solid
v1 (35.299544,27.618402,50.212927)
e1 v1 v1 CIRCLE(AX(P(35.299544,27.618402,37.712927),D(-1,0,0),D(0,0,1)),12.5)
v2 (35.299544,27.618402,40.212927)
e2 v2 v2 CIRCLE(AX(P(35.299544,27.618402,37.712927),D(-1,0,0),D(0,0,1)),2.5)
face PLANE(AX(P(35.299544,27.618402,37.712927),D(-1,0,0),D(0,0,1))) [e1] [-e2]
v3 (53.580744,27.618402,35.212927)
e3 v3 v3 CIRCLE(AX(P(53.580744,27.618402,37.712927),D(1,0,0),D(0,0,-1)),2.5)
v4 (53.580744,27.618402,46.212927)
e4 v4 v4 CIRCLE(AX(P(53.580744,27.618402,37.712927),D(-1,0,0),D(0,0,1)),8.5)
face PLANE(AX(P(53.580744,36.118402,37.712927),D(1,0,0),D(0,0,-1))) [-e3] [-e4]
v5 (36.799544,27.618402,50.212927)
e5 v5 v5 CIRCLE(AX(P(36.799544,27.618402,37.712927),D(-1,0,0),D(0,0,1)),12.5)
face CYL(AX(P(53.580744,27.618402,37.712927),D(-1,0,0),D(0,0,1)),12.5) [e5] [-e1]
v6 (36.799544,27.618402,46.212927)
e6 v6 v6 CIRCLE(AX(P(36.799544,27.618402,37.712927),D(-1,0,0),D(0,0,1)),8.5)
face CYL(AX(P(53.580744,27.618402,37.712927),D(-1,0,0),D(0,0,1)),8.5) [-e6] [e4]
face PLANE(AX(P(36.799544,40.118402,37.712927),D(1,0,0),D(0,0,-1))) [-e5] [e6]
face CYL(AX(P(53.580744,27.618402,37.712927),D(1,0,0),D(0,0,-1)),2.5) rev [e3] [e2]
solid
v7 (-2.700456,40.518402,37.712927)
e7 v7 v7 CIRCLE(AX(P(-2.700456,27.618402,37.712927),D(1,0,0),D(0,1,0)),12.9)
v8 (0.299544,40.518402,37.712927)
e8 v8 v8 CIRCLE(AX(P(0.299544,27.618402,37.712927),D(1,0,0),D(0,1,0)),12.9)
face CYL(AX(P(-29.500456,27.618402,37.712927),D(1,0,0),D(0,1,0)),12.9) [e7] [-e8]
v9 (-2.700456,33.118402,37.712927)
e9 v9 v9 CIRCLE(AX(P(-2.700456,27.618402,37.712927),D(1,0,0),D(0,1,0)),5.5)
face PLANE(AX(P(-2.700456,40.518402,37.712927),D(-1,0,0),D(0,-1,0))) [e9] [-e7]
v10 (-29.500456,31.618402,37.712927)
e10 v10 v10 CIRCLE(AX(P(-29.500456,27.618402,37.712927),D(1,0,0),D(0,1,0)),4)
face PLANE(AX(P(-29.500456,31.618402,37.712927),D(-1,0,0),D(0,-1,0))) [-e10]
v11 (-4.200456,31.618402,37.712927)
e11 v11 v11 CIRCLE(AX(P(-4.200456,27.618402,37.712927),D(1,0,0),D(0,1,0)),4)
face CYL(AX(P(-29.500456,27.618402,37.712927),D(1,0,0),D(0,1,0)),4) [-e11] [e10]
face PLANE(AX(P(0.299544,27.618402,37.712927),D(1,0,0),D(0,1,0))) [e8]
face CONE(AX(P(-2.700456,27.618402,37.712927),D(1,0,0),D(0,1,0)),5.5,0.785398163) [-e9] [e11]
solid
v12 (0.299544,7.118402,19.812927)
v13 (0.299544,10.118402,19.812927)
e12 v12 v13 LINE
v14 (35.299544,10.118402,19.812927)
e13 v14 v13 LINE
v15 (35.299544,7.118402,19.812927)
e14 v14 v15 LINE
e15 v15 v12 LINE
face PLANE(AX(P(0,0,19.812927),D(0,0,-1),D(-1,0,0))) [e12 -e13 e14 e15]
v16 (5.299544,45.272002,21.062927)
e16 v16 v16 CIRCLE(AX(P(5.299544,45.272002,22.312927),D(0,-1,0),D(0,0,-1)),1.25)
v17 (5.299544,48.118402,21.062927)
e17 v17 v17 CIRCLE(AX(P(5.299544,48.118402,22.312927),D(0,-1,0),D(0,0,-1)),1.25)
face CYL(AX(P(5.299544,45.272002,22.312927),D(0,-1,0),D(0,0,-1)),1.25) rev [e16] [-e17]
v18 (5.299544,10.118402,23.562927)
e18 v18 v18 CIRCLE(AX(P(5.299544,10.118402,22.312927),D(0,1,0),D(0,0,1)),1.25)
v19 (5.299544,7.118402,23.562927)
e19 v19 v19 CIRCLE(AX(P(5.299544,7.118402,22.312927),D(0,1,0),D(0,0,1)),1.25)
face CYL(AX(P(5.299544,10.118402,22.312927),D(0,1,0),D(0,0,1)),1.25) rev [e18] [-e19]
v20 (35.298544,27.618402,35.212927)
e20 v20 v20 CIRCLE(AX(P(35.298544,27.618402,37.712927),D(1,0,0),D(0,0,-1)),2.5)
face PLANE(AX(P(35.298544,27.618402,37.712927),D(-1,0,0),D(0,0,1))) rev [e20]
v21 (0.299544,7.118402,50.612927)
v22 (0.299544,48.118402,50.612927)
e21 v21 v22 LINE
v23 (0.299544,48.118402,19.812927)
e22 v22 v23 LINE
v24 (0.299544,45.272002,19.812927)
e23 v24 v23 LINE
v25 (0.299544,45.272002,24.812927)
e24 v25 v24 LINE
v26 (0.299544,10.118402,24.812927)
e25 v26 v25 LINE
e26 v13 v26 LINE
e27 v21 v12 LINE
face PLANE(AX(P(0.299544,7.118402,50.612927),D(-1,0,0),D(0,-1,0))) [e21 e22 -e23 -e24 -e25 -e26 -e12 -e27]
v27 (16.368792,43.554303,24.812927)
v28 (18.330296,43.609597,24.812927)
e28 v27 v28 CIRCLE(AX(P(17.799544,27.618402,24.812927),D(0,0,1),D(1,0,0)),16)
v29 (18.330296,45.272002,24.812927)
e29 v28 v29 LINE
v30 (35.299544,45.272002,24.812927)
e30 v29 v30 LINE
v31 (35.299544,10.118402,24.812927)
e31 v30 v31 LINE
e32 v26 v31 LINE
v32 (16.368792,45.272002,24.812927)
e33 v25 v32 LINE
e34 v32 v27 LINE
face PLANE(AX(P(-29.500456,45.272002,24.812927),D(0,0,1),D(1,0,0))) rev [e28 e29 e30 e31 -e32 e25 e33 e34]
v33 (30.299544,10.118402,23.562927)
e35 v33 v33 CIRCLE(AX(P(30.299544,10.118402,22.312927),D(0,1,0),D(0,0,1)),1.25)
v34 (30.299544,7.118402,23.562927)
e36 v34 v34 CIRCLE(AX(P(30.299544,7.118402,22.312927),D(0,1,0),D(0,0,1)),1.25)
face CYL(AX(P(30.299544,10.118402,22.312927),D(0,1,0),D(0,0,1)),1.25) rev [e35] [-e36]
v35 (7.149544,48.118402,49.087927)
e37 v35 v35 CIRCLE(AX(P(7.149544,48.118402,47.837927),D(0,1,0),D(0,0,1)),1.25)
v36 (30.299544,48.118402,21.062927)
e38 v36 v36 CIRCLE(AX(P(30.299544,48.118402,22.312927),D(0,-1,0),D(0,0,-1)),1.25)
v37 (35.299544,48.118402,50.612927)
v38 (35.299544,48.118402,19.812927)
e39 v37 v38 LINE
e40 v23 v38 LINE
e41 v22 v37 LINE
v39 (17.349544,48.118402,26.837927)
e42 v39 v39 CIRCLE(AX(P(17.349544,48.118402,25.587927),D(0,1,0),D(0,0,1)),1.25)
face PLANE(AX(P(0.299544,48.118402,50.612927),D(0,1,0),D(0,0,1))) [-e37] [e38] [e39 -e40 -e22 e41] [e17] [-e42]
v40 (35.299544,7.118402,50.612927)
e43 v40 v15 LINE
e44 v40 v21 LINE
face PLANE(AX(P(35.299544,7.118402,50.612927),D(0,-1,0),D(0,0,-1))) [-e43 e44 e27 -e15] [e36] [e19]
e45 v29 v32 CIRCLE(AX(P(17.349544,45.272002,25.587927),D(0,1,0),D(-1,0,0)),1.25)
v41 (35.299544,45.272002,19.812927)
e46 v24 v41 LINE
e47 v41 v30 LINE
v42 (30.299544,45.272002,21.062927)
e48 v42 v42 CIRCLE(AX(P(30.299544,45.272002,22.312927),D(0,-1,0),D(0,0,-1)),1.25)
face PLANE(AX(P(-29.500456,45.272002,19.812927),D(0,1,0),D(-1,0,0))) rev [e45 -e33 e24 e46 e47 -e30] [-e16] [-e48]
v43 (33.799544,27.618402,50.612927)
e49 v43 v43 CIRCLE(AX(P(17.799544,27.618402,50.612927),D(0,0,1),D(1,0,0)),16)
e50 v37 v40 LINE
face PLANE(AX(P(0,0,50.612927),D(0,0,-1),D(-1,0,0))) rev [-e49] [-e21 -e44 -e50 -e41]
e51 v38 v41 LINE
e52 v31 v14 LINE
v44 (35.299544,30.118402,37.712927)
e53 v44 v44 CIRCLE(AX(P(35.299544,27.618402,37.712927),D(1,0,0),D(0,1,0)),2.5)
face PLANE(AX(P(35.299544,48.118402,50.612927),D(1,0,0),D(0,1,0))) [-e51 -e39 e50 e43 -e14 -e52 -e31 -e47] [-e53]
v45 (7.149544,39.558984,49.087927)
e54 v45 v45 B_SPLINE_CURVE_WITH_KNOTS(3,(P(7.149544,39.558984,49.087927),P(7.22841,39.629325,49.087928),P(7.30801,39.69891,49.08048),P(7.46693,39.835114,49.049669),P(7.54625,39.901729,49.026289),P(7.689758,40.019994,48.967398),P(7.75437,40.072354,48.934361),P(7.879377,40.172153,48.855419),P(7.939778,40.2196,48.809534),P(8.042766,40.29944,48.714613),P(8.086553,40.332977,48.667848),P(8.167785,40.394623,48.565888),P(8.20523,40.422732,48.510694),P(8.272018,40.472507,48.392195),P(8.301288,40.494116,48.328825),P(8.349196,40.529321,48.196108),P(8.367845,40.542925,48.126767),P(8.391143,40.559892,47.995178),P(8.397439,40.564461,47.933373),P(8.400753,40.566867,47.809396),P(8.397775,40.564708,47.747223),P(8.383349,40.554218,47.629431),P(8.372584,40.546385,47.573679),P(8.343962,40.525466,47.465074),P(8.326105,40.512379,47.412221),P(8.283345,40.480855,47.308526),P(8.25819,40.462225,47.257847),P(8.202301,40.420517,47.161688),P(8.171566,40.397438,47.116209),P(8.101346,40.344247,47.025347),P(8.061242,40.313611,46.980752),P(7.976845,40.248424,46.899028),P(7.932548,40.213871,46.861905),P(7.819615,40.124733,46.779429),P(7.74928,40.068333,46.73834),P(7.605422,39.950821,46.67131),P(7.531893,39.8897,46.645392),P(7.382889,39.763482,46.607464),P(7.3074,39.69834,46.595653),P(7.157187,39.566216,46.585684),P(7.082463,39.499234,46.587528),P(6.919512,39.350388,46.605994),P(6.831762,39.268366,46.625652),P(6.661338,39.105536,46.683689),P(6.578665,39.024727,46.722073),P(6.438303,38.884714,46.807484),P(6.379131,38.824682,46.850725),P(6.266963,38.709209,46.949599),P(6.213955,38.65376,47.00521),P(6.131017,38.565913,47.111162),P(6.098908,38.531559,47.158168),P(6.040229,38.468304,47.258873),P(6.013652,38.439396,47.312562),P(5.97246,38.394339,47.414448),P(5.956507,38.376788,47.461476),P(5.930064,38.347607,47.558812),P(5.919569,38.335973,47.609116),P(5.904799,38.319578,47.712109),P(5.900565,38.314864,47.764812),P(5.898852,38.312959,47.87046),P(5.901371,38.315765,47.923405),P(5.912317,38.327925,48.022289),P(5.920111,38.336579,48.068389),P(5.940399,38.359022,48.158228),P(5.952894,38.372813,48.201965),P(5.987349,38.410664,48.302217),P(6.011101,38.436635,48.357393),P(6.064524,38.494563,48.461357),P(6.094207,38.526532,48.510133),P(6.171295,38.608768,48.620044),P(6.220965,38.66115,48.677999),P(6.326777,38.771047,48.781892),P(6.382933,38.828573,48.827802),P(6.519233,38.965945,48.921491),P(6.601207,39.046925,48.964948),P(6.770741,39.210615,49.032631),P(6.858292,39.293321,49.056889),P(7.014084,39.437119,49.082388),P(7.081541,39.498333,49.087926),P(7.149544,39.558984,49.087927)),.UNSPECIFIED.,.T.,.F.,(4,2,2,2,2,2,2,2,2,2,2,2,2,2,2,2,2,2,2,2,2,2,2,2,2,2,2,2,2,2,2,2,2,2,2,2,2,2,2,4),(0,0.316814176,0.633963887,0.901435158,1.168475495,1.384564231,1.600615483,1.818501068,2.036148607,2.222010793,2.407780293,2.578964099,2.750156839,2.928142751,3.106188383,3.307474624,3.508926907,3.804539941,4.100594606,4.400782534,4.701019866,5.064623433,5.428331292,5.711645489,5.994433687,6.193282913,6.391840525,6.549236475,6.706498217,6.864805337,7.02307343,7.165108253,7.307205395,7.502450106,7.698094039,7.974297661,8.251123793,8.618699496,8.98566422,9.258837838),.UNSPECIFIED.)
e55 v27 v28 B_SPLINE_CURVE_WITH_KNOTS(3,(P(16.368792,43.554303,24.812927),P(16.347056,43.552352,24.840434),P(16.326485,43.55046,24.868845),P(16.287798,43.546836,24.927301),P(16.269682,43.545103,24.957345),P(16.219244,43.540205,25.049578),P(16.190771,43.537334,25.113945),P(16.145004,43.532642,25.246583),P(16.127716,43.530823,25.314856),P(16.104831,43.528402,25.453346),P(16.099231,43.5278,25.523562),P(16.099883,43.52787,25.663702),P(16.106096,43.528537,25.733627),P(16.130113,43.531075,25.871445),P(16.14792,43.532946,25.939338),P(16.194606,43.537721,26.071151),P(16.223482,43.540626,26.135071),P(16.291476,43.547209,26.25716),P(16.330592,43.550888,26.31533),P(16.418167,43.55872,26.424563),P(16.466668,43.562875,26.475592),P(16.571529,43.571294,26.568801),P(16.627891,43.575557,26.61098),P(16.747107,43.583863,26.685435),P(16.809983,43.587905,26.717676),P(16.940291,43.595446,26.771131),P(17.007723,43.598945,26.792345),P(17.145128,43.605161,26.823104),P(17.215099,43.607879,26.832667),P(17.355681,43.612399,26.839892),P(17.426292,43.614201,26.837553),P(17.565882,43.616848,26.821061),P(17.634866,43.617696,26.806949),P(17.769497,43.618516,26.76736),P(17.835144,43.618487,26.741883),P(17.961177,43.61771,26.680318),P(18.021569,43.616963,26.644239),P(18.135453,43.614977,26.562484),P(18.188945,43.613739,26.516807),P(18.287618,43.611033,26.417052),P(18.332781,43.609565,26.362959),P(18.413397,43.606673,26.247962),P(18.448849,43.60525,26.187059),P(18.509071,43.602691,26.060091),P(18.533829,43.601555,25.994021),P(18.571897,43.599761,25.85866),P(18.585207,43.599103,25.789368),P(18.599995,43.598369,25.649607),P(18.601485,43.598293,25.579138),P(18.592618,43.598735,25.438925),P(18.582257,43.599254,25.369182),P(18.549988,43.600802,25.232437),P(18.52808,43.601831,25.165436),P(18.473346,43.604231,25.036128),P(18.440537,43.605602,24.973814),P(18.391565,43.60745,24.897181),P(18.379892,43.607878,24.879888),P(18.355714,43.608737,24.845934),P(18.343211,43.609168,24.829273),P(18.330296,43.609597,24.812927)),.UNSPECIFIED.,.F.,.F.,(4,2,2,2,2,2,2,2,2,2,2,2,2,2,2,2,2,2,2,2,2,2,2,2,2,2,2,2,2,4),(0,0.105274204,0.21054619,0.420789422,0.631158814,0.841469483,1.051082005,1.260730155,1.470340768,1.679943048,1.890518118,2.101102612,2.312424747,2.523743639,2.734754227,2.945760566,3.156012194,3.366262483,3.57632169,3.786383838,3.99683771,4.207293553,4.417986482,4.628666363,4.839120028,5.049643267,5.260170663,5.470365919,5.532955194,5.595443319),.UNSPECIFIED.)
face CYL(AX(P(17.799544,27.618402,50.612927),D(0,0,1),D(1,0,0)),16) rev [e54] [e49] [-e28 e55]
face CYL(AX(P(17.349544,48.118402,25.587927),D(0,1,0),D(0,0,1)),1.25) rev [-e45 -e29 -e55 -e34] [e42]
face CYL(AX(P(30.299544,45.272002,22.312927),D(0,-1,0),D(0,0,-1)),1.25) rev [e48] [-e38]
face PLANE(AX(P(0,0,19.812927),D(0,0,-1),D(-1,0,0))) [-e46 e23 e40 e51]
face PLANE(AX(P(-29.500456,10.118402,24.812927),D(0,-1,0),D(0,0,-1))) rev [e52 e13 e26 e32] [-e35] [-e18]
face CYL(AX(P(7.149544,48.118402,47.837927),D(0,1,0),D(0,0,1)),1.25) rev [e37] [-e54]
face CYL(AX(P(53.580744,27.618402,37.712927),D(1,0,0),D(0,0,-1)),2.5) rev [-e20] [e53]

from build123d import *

# Parameters (mm, degrees)
SKETCH24_W                     = 35
SKETCH24_H                     = 41
BOSS_EXTRUDE2_DEPTH            = 30.8
SKETCH30_W                     = 5
SKETCH30_H                     = 35.1536
CUT_EXTRUDE2_DEPTH             = 96.268509944
SKETCH38_W                     = 16
SKETCH38_H                     = 30.8
F_10_START                     = 35.298543859
F_10_CLEARANCE_HOLE2_OUTLINE_R = 2.5
F_10_CLEARANCE_HOLE2_DEPTH     = 18.2822
SKETCH42_W                     = 1.25
SKETCH42_H                     = 20.5
SKETCH44_W                     = 1.25
SKETCH44_H                     = 20.5
SKETCH46_W                     = 1.25
SKETCH46_H                     = 2.8464
F_2_CLEARANCE_HOLE7_AT_2_COUNT = 2
F_2_CLEARANCE_HOLE7_AT_2_PITCH = 25
SKETCH48_W                     = 1.25
SKETCH48_H                     = 3
F_2_CLEARANCE_HOLE8_AT_2_COUNT = 2
F_2_CLEARANCE_HOLE8_AT_2_PITCH = 25


# Read off the part's stored shape, not the designer's step: #10 Clearance Hole2
with BuildPart() as part:
    # Sketch19 → Revolve2 (revolve)
    with BuildSketch(Plane.XY.offset(37.712926777)):
        Polygon((-29.500456141, 31.618402197), (-29.500456141, 27.618402197), (0.299543859, 27.618402197), (0.299543859, 40.518402197), (-2.700456141, 40.518402197), (-2.700456141, 33.118402196), (-4.200456141, 31.618402197), align=None)
    revolve(axis=Axis((-29.500456141, 27.618402197, 37.712926777), (1, 0, 0)))


with BuildPart() as body_2:
    # Sketch24 → Boss-Extrude2 (new body)
    with BuildSketch(Plane(origin=(0, 0, 19.812926777), x_dir=(-1, 0, 0), z_dir=(0, 0, -1))):
        with Locations((-17.799543859, 27.618402197)):
            Rectangle(SKETCH24_W, SKETCH24_H)
    extrude(amount=-BOSS_EXTRUDE2_DEPTH)

    # Sketch30 → Cut-Extrude2 (cut, through all)
    with BuildSketch(Plane(origin=(35.299543859, 0, 0), x_dir=(0, 0, -1), z_dir=(1, 0, 0))):
        with Locations((-22.312926777, 27.695202197)):
            Rectangle(SKETCH30_W, SKETCH30_H)
    extrude(amount=-CUT_EXTRUDE2_DEPTH, mode=Mode.SUBTRACT)

    # Sketch38 → Hole2 (revolve, cut)
    with BuildSketch(Plane(origin=(17.799543859, 27.618402197, 50.612926777), x_dir=(0, -1, 0), z_dir=(1, 0, 0))):
        with Locations((8, 15.4)):
            Rectangle(SKETCH38_W, SKETCH38_H)
    revolve(axis=Axis((17.799543859, 27.618402197, -59.387073223), (0, 0, 1)), mode=Mode.SUBTRACT)


with BuildPart() as body_3:
    # Sketch37 → Revolve3 (revolve)
    with BuildSketch(Plane(origin=(0, 0, 37.712926777), x_dir=(-1, 0, 0), z_dir=(0, 0, -1)), mode=Mode.PRIVATE) as revolve3_sk:
        Polygon((-53.580743859, 36.118402197), (-53.580743859, 27.618402197), (-35.299543859, 27.618402197), (-35.299543859, 40.118402197), (-36.799543859, 40.118402197), (-36.799543859, 36.118402197), align=None)
    revolve(revolve3_sk.sketch.rotate(Axis((53.580743859, 27.618402197, 37.712926777), (-1, 0, 0)), 270), axis=Axis((53.580743859, 27.618402197, 37.712926777), (-1, 0, 0)))


with BuildPart() as f_10_clearance_hole2_tool:
    # #10 Clearance Hole2 outline → #10 Clearance Hole2 (new body)
    with BuildSketch(Plane.YZ.offset(F_10_START)):
        with Locations((27.618402197, 37.712926777)):
            Circle(F_10_CLEARANCE_HOLE2_OUTLINE_R)
    extrude(amount=F_10_CLEARANCE_HOLE2_DEPTH)


with BuildPart() as body_2_1:
    add(body_2.part)

    # #10 Clearance Hole2: cut by f_10_clearance_hole2_tool
    add(f_10_clearance_hole2_tool.part, mode=Mode.SUBTRACT)

    # Sketch42 → #2 Clearance Hole5 (revolve, cut)
    with BuildSketch(Plane(origin=(7.149543859, 48.118402197, 47.837926777), x_dir=(0, 0, 1), z_dir=(1, 0, 0))):
        with Locations((0.625, 10.25)):
            Rectangle(SKETCH42_W, SKETCH42_H)
    revolve(axis=Axis((7.149543859, 54.468402197, 47.837926777), (0, -1, 0)), mode=Mode.SUBTRACT)

    # Sketch44 → #2 Clearance Hole6 (revolve, cut)
    with BuildSketch(Plane(origin=(17.349543859, 48.118402197, 25.587926777), x_dir=(0, 0, 1), z_dir=(1, 0, 0))):
        with Locations((0.625, 10.25)):
            Rectangle(SKETCH44_W, SKETCH44_H)
    revolve(axis=Axis((17.349543859, 54.468402197, 25.587926777), (0, -1, 0)), mode=Mode.SUBTRACT)

    # Sketch46 → #2 Clearance Hole7 (revolve, cut)
    with BuildSketch(Plane(origin=(5.299543859, 45.272002197, 22.312926777), x_dir=(0, 0, -1), z_dir=(1, 0, 0))):
        with Locations((0.625, 1.4232)):
            Rectangle(SKETCH46_W, SKETCH46_H)
    f_2_clearance_hole7 = revolve(axis=Axis((5.299543859, 38.922002197, 22.312926777), (0, 1, 0)), mode=Mode.SUBTRACT)

    # #2 Clearance Hole7 at 2: #2 Clearance Hole7 ×2
    with Locations(*[(i * F_2_CLEARANCE_HOLE7_AT_2_PITCH, 0, 0) for i in range(1, F_2_CLEARANCE_HOLE7_AT_2_COUNT)]):
        add(f_2_clearance_hole7, mode=Mode.SUBTRACT)

    # Sketch48 → #2 Clearance Hole8 (revolve, cut)
    with BuildSketch(Plane(origin=(5.299543859, 10.118402197, 22.312926777), x_dir=(0, 0, 1), z_dir=(1, 0, 0))):
        with Locations((0.625, 1.5)):
            Rectangle(SKETCH48_W, SKETCH48_H)
    f_2_clearance_hole8 = revolve(axis=Axis((5.299543859, 16.468402197, 22.312926777), (0, -1, 0)), mode=Mode.SUBTRACT)

    # #2 Clearance Hole8 at 2: #2 Clearance Hole8 ×2
    with Locations(*[(i * F_2_CLEARANCE_HOLE8_AT_2_PITCH, 0, 0) for i in range(1, F_2_CLEARANCE_HOLE8_AT_2_COUNT)]):
        add(f_2_clearance_hole8, mode=Mode.SUBTRACT)


with BuildPart() as body_3_1:
    add(body_3.part)

    # #10 Clearance Hole2: cut by f_10_clearance_hole2_tool
    add(f_10_clearance_hole2_tool.part, mode=Mode.SUBTRACT)


solid = Compound([part.part, body_2_1.part, body_3_1.part])
